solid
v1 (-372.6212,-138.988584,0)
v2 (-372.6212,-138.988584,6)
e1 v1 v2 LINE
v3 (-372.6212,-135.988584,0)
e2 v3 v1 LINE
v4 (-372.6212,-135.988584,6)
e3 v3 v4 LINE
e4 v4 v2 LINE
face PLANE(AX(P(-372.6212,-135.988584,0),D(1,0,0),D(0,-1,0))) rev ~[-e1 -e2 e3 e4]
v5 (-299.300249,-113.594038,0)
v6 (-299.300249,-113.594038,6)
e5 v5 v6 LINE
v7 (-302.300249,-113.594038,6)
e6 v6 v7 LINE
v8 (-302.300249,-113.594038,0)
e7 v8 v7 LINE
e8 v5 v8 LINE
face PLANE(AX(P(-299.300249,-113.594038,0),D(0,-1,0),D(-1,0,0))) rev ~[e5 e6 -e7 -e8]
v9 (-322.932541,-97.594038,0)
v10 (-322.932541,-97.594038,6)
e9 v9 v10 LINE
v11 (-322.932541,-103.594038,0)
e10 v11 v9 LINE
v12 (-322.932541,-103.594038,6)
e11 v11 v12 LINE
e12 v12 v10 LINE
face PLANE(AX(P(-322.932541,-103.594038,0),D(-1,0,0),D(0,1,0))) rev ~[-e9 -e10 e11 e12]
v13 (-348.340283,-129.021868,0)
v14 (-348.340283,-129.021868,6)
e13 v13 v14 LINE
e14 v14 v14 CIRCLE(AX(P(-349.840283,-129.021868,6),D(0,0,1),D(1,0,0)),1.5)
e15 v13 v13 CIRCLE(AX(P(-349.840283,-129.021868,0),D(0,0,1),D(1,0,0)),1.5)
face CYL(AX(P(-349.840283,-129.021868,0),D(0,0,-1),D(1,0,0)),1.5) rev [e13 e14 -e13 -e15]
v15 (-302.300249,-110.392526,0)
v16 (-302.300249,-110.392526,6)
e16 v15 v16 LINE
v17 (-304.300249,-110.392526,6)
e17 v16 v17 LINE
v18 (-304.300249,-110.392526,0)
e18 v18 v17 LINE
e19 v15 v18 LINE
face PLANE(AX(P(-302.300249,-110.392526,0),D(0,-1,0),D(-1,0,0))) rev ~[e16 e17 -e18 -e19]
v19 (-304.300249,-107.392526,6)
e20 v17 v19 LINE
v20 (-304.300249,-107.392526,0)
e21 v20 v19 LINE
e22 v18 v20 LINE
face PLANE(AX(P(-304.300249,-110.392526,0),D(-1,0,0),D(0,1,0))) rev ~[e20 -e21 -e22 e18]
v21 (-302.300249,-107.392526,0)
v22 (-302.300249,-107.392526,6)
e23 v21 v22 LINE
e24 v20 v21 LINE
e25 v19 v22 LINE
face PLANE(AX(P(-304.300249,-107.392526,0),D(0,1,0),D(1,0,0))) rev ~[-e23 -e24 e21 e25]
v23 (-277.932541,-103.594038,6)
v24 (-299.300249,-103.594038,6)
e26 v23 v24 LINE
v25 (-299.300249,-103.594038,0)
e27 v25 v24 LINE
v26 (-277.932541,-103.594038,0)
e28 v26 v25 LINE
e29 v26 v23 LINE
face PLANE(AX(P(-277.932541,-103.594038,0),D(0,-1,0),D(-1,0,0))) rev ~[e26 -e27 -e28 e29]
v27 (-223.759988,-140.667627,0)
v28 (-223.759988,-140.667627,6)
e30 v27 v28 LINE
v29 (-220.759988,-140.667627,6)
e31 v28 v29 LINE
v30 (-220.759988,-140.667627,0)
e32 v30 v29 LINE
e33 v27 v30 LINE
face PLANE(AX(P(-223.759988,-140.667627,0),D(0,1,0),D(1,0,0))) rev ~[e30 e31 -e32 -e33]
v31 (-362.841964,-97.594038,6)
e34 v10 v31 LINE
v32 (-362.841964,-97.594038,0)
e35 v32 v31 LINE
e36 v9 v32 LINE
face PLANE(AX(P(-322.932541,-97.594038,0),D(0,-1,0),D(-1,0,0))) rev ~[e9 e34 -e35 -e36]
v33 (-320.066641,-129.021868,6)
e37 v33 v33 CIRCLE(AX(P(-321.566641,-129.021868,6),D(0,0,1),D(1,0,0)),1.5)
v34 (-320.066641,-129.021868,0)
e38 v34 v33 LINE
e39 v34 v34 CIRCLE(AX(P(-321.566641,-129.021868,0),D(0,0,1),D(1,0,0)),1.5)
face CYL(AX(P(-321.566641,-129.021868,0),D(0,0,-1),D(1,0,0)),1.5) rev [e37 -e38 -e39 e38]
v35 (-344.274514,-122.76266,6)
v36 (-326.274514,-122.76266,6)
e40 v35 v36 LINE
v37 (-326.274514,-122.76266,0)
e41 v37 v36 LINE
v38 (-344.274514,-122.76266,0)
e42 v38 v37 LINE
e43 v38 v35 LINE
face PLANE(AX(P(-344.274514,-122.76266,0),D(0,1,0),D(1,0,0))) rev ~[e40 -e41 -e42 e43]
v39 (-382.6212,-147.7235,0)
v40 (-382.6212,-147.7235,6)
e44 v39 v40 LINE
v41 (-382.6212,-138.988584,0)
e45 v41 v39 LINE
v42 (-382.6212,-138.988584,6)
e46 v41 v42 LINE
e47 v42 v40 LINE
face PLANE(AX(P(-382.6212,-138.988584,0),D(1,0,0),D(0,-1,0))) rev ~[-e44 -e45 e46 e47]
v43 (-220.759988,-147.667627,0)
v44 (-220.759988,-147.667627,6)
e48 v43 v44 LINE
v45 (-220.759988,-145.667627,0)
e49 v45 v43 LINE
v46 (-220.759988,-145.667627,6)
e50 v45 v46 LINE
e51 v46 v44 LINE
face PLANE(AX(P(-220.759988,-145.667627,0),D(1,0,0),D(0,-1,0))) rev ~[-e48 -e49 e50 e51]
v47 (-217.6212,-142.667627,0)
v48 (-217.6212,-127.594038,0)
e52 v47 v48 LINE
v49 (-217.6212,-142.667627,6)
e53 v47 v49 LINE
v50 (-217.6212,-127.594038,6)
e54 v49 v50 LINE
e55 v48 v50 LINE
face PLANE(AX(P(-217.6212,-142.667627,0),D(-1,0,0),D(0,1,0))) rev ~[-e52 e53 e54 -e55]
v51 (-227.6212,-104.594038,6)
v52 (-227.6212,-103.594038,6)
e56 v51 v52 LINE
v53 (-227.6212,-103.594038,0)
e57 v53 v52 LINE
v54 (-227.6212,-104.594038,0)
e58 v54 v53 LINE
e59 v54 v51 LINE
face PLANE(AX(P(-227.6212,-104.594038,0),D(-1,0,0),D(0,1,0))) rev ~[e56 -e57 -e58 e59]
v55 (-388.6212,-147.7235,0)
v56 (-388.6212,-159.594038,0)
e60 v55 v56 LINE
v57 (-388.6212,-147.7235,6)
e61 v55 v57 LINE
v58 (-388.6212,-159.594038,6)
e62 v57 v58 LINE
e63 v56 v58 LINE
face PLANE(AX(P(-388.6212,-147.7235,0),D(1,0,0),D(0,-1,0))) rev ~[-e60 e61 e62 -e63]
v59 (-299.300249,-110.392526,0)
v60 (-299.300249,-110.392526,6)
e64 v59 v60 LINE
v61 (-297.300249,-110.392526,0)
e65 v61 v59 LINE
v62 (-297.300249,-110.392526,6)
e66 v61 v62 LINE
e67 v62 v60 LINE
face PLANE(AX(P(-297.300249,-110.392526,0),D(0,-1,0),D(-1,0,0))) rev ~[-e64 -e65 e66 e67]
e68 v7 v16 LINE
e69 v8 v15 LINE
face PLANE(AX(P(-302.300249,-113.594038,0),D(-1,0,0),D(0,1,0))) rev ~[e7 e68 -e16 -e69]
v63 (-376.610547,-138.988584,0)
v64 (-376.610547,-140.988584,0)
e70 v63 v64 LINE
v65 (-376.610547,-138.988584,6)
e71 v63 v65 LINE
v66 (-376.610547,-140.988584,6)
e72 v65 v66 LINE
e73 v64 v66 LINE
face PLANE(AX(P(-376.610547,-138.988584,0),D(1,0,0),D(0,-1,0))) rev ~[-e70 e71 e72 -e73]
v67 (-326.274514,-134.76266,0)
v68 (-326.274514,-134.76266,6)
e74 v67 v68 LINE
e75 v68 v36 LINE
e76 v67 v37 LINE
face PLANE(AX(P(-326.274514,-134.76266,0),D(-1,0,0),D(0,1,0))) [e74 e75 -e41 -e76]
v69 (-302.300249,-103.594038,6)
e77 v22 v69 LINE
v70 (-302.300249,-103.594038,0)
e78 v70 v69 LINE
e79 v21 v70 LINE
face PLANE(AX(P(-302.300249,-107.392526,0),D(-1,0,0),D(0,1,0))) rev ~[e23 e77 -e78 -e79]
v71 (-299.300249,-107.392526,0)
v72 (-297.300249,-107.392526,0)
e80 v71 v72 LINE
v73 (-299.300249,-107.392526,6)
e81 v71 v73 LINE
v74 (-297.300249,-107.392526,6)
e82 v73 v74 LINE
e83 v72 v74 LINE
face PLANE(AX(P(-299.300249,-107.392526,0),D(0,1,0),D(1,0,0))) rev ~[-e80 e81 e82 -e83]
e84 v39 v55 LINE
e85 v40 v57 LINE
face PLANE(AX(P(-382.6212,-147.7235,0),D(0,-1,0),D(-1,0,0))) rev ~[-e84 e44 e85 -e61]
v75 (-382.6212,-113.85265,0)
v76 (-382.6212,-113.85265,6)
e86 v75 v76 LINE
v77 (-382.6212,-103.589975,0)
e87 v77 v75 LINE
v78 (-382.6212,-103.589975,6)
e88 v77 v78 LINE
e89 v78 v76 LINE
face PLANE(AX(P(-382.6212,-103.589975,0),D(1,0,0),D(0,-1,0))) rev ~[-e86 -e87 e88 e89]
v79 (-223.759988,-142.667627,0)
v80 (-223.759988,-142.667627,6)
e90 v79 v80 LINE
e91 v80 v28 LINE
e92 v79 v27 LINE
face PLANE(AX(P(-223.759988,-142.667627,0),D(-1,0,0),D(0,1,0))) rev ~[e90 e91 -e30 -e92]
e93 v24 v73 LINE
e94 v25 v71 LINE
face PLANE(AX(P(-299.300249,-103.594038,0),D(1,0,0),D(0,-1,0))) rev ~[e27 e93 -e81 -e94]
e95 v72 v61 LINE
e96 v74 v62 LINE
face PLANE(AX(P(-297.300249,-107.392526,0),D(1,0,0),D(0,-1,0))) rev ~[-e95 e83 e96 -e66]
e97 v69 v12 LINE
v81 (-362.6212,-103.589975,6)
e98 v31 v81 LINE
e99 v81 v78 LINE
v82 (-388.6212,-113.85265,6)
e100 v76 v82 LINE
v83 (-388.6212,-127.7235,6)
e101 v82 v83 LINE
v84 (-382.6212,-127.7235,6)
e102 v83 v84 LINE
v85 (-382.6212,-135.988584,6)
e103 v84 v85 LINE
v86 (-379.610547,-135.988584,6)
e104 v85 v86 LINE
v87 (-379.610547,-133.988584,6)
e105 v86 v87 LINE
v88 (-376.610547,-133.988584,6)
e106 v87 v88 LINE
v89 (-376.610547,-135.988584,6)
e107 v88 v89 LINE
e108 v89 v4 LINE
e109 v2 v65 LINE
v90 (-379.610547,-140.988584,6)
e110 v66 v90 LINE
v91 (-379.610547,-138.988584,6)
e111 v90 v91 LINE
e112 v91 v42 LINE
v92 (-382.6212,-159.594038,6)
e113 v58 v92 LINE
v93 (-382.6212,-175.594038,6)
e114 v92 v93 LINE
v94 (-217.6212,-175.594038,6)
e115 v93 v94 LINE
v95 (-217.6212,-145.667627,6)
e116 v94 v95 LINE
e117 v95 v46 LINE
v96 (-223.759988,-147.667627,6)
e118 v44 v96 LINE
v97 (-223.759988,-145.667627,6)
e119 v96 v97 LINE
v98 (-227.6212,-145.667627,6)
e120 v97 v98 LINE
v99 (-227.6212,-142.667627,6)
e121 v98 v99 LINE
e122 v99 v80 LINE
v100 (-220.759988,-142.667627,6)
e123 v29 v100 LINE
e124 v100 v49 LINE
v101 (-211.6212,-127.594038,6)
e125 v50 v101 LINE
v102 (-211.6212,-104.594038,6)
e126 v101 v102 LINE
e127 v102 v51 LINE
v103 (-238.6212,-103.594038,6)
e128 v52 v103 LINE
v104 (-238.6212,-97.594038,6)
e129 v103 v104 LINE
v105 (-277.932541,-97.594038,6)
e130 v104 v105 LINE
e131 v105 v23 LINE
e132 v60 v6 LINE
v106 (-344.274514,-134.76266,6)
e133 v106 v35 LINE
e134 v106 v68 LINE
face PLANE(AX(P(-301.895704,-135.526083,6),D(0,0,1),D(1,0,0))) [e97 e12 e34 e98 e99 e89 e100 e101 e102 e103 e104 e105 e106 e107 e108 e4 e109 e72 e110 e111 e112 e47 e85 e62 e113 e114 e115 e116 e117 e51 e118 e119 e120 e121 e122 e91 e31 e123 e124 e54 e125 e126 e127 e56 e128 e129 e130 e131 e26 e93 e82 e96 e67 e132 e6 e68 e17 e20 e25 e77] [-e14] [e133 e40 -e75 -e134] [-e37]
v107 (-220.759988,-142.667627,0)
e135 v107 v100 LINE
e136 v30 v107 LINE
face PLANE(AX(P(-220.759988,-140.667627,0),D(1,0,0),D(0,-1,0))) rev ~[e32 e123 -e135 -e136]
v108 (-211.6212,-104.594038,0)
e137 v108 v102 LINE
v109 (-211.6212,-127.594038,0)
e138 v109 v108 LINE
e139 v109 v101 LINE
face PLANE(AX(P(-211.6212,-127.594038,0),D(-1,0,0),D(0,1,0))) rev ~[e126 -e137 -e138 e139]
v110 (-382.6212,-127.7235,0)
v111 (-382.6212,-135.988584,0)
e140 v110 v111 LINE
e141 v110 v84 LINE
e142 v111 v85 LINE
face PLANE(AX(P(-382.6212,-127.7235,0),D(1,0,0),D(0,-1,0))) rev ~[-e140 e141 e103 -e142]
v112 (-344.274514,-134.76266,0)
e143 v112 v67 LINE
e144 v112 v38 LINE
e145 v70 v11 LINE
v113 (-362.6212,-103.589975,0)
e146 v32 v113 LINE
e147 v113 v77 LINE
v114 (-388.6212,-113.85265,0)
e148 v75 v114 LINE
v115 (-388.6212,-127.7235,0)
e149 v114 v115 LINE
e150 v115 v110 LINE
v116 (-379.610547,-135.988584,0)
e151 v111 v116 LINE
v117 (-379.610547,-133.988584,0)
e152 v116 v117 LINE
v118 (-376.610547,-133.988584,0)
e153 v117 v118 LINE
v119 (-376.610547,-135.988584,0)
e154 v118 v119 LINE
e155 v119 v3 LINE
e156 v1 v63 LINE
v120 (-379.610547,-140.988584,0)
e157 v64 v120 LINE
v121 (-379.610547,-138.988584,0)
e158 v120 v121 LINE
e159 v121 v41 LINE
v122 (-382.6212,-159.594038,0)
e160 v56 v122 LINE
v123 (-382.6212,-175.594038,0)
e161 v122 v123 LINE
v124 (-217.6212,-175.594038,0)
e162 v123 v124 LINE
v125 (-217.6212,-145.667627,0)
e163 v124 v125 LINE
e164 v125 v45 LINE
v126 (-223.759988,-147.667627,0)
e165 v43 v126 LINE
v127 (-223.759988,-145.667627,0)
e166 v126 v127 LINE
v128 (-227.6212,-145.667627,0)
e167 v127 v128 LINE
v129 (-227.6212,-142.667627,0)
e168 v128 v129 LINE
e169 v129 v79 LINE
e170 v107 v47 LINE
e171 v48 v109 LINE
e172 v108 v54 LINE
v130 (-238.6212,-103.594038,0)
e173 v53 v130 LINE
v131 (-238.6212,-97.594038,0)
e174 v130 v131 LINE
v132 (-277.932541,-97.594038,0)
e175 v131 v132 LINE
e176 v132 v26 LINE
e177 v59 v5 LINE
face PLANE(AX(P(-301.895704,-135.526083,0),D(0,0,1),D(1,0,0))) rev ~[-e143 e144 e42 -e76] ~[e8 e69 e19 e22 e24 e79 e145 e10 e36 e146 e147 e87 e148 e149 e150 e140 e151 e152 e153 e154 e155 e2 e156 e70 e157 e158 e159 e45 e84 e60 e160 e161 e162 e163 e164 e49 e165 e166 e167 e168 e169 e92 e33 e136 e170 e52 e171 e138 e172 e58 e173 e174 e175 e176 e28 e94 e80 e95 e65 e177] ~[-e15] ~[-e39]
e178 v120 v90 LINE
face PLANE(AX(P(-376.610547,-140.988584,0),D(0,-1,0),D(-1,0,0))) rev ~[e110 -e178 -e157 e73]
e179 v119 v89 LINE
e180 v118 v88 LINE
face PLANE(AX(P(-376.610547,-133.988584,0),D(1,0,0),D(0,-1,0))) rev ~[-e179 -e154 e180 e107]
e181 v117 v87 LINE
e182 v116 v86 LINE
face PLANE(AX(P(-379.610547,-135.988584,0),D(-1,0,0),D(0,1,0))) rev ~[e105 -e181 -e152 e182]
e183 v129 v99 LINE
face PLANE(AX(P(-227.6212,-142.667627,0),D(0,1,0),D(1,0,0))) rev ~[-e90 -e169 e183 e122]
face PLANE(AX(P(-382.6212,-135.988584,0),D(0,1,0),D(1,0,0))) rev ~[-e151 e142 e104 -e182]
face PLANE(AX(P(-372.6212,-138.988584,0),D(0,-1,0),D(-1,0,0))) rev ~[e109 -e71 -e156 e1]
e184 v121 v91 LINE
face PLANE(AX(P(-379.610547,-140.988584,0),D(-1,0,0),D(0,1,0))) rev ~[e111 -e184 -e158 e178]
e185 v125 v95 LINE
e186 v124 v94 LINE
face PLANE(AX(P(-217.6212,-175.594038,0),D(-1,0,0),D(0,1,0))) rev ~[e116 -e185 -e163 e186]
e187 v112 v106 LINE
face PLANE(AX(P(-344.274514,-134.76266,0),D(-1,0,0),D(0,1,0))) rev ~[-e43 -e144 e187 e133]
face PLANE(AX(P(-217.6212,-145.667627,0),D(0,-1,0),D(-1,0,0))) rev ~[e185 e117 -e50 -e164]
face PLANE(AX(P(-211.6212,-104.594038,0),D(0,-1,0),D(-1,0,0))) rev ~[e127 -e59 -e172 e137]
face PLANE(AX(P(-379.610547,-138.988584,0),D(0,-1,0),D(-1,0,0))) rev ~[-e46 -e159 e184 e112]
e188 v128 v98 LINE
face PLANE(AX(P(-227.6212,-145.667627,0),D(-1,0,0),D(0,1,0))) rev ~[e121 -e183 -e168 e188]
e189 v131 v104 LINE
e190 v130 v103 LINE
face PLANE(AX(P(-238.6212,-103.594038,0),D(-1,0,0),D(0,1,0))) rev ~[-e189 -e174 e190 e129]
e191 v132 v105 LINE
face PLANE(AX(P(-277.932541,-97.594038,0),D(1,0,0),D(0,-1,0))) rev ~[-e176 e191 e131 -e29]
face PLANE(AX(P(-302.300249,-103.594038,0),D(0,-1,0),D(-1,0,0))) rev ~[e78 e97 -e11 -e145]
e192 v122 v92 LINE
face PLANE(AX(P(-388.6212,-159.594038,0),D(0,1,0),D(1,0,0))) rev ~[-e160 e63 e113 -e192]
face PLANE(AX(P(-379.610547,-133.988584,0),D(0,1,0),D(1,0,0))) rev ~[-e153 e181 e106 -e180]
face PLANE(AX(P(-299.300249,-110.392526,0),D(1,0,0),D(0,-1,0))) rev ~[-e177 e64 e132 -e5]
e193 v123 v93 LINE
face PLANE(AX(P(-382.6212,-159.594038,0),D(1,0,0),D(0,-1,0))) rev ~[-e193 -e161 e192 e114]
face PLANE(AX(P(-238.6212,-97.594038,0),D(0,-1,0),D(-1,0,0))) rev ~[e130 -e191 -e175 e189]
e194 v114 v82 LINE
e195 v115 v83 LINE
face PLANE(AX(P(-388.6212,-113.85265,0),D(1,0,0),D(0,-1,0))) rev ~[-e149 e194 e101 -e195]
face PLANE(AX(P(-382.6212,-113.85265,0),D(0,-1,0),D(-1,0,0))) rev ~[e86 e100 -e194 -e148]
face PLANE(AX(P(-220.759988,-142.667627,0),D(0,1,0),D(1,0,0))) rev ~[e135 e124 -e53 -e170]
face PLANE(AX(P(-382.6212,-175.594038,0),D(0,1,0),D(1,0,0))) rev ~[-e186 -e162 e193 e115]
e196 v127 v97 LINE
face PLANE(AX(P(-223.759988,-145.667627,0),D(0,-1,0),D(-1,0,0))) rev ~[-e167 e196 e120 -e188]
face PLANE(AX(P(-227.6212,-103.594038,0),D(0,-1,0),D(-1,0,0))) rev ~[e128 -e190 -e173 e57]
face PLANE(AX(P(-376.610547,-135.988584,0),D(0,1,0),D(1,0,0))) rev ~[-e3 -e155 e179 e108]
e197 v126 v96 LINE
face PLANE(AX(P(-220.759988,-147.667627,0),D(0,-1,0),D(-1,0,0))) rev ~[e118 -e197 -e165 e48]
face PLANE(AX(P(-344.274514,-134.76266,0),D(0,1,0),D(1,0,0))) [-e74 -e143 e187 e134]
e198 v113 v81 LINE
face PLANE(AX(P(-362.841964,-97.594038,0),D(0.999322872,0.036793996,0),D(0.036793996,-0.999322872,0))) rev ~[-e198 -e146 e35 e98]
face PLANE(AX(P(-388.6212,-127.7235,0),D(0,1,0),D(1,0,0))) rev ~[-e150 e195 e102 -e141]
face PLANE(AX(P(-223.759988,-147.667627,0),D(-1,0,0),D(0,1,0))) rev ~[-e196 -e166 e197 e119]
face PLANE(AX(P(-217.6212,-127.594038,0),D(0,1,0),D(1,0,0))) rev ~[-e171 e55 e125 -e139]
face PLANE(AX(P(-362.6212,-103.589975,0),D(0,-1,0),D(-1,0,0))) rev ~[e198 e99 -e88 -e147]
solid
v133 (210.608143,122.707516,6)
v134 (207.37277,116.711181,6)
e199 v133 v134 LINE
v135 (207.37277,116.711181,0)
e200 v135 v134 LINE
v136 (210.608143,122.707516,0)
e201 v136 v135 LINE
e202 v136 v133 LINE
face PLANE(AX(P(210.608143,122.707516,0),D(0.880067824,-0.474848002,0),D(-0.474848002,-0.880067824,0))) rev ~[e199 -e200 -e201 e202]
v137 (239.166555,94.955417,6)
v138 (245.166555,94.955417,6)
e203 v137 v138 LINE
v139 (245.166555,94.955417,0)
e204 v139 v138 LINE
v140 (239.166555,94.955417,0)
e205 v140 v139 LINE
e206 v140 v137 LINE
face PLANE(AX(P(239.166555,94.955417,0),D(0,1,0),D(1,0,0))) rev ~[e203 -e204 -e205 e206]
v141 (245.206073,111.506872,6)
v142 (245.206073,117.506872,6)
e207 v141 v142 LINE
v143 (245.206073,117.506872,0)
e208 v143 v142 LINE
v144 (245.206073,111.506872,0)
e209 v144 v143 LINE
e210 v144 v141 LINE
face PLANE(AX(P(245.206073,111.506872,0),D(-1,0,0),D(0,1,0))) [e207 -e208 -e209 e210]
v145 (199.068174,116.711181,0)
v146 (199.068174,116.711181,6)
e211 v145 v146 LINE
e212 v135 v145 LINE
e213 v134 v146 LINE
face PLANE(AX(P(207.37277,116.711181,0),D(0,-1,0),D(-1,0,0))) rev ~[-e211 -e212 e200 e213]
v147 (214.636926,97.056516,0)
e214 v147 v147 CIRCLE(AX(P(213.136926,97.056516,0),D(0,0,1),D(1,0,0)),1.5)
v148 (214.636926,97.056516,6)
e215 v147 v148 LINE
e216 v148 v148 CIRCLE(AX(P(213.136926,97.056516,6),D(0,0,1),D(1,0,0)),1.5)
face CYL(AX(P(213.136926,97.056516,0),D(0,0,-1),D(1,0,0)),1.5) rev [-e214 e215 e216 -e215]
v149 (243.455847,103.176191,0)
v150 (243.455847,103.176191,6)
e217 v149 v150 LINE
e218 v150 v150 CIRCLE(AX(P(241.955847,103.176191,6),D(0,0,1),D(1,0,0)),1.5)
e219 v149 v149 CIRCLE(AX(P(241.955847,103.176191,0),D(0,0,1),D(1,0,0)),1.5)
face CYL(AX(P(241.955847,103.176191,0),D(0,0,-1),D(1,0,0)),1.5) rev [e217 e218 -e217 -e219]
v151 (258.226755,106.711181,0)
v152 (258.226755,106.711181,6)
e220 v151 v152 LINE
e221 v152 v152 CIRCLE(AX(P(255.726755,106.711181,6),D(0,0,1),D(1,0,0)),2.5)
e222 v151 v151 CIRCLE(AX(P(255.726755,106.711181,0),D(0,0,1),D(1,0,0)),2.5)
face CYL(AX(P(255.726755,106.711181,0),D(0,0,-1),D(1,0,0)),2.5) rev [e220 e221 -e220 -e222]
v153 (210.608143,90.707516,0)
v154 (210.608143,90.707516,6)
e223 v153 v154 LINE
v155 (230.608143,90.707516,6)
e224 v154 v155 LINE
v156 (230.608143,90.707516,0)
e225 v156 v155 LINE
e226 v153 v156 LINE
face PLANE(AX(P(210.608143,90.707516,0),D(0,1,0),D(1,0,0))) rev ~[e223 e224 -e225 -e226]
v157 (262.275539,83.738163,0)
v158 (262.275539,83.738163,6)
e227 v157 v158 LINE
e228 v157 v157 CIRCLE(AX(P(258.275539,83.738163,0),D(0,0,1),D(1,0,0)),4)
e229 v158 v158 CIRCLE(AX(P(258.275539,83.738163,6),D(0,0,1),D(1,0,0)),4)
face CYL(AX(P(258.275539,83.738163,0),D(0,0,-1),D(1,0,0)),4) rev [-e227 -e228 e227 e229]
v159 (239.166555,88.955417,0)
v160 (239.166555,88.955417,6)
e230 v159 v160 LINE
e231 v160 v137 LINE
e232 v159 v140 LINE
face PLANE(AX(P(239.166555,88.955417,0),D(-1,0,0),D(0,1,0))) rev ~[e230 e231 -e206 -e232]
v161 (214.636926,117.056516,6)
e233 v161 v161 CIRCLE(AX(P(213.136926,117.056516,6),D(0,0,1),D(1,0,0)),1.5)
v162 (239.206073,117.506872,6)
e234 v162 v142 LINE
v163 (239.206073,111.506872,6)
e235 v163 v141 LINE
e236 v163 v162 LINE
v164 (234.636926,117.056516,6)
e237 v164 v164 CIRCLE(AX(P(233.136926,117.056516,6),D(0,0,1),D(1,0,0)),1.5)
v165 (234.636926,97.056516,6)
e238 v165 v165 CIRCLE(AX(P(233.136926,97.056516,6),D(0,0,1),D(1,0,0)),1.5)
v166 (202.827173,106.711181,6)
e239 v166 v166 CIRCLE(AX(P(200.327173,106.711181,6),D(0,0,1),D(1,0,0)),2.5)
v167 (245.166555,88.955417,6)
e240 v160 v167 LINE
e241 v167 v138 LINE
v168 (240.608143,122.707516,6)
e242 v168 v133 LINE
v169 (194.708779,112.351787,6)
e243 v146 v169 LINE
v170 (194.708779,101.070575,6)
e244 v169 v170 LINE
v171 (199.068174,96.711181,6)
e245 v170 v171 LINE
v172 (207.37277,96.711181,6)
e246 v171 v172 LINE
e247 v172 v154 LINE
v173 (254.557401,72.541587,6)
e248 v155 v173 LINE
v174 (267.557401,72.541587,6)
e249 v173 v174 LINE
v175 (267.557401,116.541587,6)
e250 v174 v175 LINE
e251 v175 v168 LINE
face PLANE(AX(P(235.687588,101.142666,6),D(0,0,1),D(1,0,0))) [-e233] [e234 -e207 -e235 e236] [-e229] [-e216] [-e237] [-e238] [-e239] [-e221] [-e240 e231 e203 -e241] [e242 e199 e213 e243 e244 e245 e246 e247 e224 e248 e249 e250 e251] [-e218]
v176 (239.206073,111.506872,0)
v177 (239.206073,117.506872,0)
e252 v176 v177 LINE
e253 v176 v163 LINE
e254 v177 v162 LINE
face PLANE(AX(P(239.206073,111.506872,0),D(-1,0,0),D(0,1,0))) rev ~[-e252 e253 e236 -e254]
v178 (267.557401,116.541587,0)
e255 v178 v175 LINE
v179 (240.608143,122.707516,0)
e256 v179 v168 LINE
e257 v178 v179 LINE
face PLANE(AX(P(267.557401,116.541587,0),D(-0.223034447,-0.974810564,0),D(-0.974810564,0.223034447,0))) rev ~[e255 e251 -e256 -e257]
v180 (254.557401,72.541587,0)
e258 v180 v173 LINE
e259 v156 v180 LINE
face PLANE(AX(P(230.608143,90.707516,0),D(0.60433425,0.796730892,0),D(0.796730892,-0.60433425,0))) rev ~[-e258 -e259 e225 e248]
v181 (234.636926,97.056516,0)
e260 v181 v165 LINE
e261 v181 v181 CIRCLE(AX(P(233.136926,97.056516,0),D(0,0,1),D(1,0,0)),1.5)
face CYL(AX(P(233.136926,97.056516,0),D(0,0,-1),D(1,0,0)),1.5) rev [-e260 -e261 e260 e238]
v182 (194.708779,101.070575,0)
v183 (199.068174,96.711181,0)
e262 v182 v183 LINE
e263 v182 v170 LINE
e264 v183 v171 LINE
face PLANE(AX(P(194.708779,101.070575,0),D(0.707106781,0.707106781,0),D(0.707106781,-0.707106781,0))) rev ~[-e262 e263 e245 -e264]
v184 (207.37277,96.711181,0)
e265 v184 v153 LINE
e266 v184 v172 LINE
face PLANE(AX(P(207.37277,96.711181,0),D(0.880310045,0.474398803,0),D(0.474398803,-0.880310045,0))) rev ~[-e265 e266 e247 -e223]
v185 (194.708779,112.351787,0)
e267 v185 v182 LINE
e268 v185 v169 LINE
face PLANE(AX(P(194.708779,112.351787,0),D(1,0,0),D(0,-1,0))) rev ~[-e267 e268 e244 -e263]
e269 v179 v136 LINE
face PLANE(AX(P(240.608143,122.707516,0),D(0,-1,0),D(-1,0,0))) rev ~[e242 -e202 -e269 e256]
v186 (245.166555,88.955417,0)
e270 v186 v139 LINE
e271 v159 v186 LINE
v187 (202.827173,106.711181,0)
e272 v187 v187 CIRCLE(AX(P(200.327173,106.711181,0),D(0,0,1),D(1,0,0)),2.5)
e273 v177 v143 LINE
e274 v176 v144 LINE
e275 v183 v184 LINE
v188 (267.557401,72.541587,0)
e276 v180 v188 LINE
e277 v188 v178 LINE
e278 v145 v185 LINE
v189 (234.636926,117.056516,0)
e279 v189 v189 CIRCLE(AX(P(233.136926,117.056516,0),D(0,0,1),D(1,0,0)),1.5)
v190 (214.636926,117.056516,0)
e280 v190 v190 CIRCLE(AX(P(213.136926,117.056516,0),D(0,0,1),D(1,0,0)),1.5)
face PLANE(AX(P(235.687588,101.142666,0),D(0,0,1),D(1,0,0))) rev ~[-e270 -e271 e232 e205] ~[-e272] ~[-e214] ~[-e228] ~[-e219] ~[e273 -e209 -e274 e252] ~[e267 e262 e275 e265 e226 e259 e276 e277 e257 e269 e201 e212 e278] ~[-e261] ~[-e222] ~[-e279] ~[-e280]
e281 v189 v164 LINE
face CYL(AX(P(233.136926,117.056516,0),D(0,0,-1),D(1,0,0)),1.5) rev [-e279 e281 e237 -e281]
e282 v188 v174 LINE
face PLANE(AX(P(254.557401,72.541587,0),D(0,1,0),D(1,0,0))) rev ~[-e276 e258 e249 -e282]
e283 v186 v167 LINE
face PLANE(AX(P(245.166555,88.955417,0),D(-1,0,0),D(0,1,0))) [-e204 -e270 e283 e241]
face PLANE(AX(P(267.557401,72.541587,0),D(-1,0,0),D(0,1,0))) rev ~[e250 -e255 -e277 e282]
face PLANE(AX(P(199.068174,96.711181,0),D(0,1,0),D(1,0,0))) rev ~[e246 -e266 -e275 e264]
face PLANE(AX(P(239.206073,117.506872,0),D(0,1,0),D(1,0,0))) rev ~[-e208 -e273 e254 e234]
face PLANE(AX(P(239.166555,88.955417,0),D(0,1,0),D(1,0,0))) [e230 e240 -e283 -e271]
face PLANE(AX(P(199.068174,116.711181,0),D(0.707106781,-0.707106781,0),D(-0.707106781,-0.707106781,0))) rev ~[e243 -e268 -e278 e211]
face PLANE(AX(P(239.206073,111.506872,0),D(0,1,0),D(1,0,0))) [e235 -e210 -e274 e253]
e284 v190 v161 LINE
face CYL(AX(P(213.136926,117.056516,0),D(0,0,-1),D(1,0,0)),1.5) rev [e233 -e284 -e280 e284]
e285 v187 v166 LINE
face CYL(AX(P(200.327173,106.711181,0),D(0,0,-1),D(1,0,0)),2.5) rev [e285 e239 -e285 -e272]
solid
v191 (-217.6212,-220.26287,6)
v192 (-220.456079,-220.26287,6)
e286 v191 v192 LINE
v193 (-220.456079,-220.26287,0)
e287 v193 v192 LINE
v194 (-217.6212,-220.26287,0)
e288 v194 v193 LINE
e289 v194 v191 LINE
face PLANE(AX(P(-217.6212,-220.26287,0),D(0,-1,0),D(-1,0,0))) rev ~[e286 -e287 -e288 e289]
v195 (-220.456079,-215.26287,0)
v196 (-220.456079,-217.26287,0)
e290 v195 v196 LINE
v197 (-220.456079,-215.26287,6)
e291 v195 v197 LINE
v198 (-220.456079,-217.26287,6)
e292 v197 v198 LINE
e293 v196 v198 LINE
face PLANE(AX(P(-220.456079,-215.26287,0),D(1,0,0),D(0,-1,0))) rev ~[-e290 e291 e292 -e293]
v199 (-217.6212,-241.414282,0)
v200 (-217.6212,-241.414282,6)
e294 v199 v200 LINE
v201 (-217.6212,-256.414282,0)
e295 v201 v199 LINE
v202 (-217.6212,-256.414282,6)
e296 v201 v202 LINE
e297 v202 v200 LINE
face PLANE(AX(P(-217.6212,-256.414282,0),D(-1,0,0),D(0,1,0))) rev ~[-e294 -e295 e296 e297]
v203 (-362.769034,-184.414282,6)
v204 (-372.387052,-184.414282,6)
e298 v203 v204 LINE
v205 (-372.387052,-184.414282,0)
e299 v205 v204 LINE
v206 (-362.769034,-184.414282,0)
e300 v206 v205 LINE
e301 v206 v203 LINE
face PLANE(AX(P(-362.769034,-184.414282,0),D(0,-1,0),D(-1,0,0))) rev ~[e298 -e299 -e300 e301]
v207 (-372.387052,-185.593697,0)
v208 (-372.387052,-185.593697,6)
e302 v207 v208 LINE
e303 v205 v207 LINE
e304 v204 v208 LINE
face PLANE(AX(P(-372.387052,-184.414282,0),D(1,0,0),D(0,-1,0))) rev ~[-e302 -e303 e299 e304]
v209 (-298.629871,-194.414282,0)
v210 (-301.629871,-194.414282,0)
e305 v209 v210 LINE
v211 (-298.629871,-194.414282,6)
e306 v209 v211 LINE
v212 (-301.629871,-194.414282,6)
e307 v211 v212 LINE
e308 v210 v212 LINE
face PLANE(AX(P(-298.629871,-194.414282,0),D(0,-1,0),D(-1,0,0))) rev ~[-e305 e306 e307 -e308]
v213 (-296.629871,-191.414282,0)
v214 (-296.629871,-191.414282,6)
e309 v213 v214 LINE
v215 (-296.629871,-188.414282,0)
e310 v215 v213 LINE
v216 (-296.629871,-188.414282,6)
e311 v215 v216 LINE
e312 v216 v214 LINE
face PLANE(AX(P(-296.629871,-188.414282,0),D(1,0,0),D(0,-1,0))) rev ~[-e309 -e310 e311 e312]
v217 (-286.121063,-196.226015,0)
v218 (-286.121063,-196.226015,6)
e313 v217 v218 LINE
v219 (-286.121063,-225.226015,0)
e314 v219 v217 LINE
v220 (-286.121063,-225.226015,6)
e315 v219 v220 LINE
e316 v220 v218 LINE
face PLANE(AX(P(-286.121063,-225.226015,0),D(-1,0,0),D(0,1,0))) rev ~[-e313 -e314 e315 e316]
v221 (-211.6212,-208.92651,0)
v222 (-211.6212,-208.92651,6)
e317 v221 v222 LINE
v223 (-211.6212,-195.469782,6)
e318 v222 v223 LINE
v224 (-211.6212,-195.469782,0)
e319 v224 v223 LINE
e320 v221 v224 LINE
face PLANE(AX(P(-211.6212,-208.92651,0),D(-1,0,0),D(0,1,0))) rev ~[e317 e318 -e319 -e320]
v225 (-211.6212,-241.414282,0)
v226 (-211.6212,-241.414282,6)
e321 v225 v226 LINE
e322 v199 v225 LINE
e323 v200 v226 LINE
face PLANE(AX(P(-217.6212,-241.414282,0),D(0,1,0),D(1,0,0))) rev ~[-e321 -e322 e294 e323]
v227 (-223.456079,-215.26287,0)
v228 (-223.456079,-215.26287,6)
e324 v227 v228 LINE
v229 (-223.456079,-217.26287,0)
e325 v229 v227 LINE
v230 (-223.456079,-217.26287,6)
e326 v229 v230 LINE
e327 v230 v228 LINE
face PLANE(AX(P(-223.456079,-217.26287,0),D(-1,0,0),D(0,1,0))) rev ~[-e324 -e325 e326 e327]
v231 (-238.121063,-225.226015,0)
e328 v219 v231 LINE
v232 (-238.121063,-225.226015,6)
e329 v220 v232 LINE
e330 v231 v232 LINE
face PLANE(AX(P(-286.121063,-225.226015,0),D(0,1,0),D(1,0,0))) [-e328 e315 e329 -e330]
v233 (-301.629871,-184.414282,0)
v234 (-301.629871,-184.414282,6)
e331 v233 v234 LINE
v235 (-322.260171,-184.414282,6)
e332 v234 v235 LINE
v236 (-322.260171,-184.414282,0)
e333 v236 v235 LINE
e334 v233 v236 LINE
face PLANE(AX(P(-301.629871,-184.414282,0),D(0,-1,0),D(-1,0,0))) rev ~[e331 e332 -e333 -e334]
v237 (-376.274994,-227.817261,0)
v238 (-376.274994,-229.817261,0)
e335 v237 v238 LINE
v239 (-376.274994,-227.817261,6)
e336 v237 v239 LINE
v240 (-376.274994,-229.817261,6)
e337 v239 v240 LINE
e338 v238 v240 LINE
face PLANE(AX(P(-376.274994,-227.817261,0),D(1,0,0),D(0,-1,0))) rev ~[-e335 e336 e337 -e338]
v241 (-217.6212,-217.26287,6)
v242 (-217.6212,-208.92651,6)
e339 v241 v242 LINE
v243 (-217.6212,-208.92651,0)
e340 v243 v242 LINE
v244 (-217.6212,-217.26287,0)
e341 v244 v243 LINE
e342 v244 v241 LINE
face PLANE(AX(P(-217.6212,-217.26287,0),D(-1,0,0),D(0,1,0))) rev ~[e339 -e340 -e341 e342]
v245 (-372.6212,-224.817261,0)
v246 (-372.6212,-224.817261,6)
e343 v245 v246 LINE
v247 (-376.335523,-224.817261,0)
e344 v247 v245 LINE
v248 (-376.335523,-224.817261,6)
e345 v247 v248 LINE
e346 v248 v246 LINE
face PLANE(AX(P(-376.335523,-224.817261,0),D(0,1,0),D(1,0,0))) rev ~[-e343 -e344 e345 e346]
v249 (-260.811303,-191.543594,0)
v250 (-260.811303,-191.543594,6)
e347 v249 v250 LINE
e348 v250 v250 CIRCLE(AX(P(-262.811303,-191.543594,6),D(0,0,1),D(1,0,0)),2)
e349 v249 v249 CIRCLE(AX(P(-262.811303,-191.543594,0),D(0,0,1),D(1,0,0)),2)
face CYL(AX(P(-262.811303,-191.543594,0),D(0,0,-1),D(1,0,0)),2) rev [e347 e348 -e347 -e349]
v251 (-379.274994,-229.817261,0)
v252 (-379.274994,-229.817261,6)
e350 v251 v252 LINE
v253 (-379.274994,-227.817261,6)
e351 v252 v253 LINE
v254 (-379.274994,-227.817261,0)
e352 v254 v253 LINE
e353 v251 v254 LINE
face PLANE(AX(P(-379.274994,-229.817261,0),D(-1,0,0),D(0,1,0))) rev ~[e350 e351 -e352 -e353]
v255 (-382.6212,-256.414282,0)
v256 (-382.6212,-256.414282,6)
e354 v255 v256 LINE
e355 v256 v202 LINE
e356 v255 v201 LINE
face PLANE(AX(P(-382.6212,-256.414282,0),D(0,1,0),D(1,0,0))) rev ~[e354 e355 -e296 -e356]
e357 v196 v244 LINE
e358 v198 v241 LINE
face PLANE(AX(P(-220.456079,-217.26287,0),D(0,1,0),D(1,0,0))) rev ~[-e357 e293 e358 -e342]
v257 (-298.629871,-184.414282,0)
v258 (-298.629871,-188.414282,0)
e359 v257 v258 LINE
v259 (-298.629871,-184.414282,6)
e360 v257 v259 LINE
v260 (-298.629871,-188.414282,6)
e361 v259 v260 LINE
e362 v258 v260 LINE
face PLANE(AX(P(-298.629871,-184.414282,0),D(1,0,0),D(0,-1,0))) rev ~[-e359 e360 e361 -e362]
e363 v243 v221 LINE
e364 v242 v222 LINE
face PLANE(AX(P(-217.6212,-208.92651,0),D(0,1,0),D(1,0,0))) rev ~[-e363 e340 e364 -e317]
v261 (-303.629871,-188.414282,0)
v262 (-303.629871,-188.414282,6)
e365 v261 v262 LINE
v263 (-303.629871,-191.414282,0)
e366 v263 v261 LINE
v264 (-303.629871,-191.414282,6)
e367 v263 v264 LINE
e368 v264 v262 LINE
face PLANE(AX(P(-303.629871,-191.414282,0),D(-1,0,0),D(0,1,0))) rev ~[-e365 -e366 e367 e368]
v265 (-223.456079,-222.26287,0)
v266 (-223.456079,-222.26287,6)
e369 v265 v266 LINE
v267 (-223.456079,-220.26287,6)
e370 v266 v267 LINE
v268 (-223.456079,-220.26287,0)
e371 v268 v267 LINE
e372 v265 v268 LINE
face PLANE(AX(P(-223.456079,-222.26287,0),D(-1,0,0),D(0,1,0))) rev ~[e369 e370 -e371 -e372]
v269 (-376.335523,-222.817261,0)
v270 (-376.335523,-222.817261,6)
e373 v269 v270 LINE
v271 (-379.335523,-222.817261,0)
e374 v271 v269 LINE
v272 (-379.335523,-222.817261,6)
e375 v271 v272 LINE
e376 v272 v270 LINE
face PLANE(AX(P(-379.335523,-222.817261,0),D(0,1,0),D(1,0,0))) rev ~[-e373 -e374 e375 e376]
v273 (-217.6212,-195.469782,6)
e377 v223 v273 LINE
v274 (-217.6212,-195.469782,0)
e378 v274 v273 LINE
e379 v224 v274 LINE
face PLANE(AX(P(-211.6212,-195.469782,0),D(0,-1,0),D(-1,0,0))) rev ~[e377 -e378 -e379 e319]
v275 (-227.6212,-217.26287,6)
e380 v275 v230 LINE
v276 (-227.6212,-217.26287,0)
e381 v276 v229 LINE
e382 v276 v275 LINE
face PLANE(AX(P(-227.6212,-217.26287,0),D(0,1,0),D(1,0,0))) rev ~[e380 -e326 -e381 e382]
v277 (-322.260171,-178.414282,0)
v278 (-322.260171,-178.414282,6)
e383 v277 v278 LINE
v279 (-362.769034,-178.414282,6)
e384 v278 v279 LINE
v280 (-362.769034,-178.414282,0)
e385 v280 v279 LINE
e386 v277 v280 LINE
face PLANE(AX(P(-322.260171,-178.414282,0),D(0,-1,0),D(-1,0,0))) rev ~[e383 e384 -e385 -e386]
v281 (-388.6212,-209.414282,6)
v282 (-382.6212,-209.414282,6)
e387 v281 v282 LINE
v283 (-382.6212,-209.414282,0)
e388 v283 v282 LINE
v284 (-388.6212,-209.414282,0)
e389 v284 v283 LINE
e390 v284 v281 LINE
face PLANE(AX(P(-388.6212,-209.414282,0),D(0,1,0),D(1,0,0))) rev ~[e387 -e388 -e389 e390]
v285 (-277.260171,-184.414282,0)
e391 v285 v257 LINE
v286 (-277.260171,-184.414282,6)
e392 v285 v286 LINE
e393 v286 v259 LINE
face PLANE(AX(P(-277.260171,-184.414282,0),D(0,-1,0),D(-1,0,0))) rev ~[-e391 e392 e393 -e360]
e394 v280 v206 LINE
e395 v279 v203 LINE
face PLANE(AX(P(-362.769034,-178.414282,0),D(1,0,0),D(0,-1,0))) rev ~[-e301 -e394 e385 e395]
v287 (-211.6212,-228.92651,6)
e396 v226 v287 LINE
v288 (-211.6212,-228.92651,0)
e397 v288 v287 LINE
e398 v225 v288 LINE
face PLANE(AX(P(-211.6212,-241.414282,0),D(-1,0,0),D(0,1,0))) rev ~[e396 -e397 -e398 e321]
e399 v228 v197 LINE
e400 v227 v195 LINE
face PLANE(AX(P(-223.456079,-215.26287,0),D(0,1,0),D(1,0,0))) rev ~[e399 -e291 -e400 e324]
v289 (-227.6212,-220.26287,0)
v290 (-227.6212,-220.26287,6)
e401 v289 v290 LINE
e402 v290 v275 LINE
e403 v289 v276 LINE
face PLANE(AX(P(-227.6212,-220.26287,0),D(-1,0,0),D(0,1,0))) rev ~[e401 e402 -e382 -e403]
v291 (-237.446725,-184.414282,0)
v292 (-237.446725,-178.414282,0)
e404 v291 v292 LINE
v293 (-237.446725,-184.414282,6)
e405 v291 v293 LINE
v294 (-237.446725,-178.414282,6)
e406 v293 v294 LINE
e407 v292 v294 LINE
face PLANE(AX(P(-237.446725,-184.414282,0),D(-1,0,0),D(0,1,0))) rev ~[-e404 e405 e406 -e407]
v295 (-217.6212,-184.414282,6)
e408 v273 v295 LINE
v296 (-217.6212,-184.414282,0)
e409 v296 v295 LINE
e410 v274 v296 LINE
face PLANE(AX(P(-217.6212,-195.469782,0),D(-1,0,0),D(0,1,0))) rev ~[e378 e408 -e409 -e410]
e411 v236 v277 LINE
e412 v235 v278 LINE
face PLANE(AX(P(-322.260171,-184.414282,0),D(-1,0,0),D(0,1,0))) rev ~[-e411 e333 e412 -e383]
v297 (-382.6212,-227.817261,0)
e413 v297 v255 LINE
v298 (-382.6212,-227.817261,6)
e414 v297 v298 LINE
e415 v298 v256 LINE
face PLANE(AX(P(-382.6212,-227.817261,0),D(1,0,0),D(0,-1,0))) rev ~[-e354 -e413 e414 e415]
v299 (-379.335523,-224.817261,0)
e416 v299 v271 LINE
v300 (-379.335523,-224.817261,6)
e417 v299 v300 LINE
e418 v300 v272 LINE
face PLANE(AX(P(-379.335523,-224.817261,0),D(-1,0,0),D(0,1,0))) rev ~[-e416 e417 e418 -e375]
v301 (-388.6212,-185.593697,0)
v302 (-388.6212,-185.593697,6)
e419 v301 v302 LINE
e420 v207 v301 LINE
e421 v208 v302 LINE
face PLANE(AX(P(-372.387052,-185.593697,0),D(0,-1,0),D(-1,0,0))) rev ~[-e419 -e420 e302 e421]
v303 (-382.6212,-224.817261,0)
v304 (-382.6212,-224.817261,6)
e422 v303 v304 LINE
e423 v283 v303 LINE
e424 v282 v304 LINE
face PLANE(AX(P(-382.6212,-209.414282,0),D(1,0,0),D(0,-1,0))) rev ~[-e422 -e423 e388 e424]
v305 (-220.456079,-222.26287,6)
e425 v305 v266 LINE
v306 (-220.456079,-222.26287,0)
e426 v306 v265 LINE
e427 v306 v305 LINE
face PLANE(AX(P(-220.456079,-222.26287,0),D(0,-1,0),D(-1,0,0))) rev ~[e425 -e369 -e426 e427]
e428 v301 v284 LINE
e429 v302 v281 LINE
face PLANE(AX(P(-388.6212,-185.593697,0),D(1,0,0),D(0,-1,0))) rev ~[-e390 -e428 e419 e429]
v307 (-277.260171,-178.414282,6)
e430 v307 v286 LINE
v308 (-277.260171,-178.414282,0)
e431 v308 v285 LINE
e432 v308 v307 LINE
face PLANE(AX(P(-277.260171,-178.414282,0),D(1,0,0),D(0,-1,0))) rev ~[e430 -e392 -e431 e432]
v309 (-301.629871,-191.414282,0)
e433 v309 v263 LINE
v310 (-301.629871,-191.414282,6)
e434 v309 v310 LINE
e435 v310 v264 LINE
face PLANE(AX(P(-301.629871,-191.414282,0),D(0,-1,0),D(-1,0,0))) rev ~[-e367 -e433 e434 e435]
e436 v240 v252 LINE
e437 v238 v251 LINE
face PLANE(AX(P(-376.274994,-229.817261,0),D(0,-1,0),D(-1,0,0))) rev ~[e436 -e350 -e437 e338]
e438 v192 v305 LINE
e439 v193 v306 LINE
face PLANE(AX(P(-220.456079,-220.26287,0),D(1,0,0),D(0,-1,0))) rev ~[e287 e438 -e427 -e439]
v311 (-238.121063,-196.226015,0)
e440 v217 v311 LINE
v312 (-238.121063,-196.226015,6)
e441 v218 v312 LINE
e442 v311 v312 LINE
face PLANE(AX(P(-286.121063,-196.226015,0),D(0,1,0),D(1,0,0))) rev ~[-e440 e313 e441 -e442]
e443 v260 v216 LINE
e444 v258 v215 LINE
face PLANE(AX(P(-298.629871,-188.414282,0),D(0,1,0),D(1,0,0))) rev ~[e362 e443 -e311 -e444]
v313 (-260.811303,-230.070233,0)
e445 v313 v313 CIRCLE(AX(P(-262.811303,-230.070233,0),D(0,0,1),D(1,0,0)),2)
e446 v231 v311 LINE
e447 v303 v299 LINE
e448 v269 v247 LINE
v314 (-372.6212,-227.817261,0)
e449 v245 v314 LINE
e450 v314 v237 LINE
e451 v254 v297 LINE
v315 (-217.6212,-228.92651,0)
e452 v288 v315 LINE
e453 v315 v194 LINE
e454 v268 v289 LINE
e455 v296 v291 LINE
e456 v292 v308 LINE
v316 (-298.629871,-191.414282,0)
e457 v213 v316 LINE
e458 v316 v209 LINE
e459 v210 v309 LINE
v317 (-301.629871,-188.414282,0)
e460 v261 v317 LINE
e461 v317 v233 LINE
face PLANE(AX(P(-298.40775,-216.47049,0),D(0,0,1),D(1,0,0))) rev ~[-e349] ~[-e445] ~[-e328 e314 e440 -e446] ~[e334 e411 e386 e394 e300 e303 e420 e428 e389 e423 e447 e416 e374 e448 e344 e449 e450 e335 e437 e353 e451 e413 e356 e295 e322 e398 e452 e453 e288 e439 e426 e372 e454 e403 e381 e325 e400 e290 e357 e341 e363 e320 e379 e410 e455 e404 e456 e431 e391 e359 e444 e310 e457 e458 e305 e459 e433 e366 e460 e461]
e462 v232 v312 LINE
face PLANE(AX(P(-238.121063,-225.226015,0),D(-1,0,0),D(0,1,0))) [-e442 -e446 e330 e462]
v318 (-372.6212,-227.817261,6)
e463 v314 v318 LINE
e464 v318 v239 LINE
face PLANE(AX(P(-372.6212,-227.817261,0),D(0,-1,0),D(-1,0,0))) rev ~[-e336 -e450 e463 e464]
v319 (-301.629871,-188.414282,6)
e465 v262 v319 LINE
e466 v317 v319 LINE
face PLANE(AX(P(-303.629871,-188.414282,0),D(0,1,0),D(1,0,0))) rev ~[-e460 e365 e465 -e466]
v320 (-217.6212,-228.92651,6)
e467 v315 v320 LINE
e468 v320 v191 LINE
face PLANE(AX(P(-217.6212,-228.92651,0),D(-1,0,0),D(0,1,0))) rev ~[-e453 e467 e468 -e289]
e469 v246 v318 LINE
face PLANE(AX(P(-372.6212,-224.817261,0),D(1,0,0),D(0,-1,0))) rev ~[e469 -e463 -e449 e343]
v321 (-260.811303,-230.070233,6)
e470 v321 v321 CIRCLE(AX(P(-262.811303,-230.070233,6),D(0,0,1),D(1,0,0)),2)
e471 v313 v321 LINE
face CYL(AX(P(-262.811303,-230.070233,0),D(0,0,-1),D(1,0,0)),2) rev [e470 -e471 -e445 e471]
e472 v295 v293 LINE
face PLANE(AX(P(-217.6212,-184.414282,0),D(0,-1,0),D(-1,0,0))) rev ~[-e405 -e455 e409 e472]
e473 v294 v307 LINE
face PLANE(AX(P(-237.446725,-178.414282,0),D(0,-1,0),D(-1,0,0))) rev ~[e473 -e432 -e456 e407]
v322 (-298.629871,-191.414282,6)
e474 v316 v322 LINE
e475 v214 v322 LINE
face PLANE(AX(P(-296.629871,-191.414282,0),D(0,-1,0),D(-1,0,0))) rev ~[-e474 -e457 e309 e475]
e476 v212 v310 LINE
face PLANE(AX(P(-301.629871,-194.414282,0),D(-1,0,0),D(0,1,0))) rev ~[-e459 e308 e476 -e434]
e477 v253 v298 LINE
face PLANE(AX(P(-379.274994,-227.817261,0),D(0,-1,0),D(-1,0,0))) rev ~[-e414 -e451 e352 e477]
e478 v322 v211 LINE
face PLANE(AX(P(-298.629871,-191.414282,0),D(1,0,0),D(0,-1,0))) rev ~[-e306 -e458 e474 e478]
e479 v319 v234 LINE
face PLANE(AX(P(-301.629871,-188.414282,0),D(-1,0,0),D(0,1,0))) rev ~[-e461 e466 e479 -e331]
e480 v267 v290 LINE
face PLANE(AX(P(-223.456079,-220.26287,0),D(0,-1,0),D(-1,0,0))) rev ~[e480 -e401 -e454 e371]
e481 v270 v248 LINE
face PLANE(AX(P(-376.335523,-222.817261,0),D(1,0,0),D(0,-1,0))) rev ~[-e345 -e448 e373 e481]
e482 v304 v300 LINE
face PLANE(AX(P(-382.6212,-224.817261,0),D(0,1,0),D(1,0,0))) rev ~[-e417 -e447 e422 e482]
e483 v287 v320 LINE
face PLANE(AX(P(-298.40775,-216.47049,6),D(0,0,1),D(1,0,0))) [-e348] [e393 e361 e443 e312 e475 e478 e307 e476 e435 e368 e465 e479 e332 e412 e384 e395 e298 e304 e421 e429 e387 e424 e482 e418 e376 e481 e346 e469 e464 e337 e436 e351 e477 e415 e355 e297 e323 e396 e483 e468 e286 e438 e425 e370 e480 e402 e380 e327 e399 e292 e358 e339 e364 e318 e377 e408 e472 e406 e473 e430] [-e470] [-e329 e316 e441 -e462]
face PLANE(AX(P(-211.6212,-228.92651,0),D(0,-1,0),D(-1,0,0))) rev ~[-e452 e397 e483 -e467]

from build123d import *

# Parameters (mm, degrees)
F0_R     = 2
F0_W     = 48
F0_H     = 29
F1_DEPTH = 6
F0_R_2   = 1.5
F0_W_2   = 18
F0_H_2   = 12
F2_DEPTH = 6
F0_R_3   = 4
F0_W_3   = 6
F0_H_3   = 6
F0_R_4   = 2.5
F3_DEPTH = 6


# Not quite as in the source:
# - a feature of the source that left no trace in its solid (it failed there, or was rolled back) is left out


with BuildPart() as f1:
    # F0 (on Top) → F1 (new body)
    with BuildSketch(Plane.XY):
        Polygon((-322.260171175, -178.4142817259), (-362.7690343857, -178.4142817259), (-362.7690343857, -184.4142817259), (-372.3870515823, -184.4142817259), (-372.3870515823, -185.5936968327), (-388.6211997944, -185.5936968327), (-388.6211997944, -209.4142817259), (-382.6211997944, -209.4142817259), (-382.6211997944, -224.8172610998), (-379.3355226517, -224.8172610998), (-379.3355226517, -222.8172610998), (-376.3355226517, -222.8172610998), (-376.3355226517, -224.8172610998), (-372.6211997944, -224.8172610998), (-372.6211997944, -227.8172610998), (-376.2749941349, -227.8172610998), (-376.2749941349, -229.8172610998), (-379.2749941349, -229.8172610998), (-379.2749941349, -227.8172610998), (-382.6211997944, -227.8172610998), (-382.6211997944, -256.4142817259), (-217.6211997944, -256.4142817259), (-217.6211997944, -241.4142817259), (-211.6211997944, -241.4142817259), (-211.6211997944, -228.9265096188), (-217.6211997944, -228.9265096188), (-217.6211997944, -220.2628701925), (-220.4560786486, -220.2628701925), (-220.4560786486, -222.2628701925), (-223.4560786486, -222.2628701925), (-223.4560786486, -220.2628701925), (-227.6211997944, -220.2628701925), (-227.6211997944, -217.2628701925), (-223.4560786486, -217.2628701925), (-223.4560786486, -215.2628701925), (-220.4560786486, -215.2628701925), (-220.4560786486, -217.2628701925), (-217.6211997944, -217.2628701925), (-217.6211997944, -208.9265096188), (-211.6211997944, -208.9265096188), (-211.6211997944, -195.4697817564), (-217.6211997944, -195.4697817564), (-217.6211997944, -184.4142817259), (-237.4467253685, -184.4142817259), (-237.4467253685, -178.4142817259), (-277.260171175, -178.4142817259), (-277.260171175, -184.4142817259), (-298.62987113, -184.4142817259), (-298.62987113, -188.4142817259), (-296.62987113, -188.4142817259), (-296.62987113, -191.4142817259), (-298.62987113, -191.4142817259), (-298.62987113, -194.4142817259), (-301.62987113, -194.4142817259), (-301.62987113, -191.4142817259), (-303.62987113, -191.4142817259), (-303.62987113, -188.4142817259), (-301.62987113, -188.4142817259), (-301.62987113, -184.4142817259), (-322.260171175, -184.4142817259), align=None)
        with Locations((-262.8113031387, -230.070233345)):
            Circle(F0_R, mode=Mode.SUBTRACT)
        with Locations((-262.1210625172, -210.7260148525)):
            Rectangle(F0_W, F0_H, mode=Mode.SUBTRACT)
        with Locations((-262.8113031387, -191.5435940027)):
            Circle(F0_R, mode=Mode.SUBTRACT)
    extrude(amount=F1_DEPTH)


with BuildPart() as f2:
    # F0 (on Top) → F2 (new body)
    with BuildSketch(Plane.XY):
        Polygon((-322.9325413704, -97.594037652), (-362.841963768, -97.594037652), (-362.6211997944, -103.5899748822), (-382.6211997944, -103.5899748822), (-382.6211997944, -113.8526499271), (-388.6211997944, -113.8526499271), (-388.6211997944, -127.7235001326), (-382.6211997944, -127.7235001326), (-382.6211997944, -135.98858428), (-379.6105473042, -135.98858428), (-379.6105473042, -133.98858428), (-376.6105473042, -133.98858428), (-376.6105473042, -135.98858428), (-372.6211997944, -135.98858428), (-372.6211997944, -138.98858428), (-376.6105473042, -138.98858428), (-376.6105473042, -140.98858428), (-379.6105473042, -140.98858428), (-379.6105473042, -138.98858428), (-382.6211997944, -138.98858428), (-382.6211997944, -147.7235001326), (-388.6211997944, -147.7235001326), (-388.6211997944, -159.594037652), (-382.6211997944, -159.594037652), (-382.6211997944, -175.594037652), (-217.6211997944, -175.594037652), (-217.6211997944, -145.6676274538), (-220.7599878311, -145.6676274538), (-220.7599878311, -147.6676274538), (-223.7599878311, -147.6676274538), (-223.7599878311, -145.6676274538), (-227.6211997944, -145.6676274538), (-227.6211997944, -142.6676274538), (-223.7599878311, -142.6676274538), (-223.7599878311, -140.6676274538), (-220.7599878311, -140.6676274538), (-220.7599878311, -142.6676274538), (-217.6211997944, -142.6676274538), (-217.6211997944, -127.594037652), (-211.6211997944, -127.594037652), (-211.6211997944, -104.594037652), (-227.6211997944, -104.594037652), (-227.6211997944, -103.594037652), (-238.6211997944, -103.594037652), (-238.6211997944, -97.594037652), (-277.9325413704, -97.594037652), (-277.9325413704, -103.594037652), (-299.3002493382, -103.594037652), (-299.3002493382, -107.3925257921), (-297.3002493382, -107.3925257921), (-297.3002493382, -110.3925257921), (-299.3002493382, -110.3925257921), (-299.3002493382, -113.594037652), (-302.3002493382, -113.594037652), (-302.3002493382, -110.3925257921), (-304.3002493382, -110.3925257921), (-304.3002493382, -107.3925257921), (-302.3002493382, -107.3925257921), (-302.3002493382, -103.594037652), (-322.9325413704, -103.594037652), align=None)
        with Locations((-349.8402833939, -129.0218681097)):
            Circle(F0_R_2, mode=Mode.SUBTRACT)
        with Locations((-335.2745141983, -128.7626596689)):
            Rectangle(F0_W_2, F0_H_2, mode=Mode.SUBTRACT)
        with Locations((-321.5666413307, -129.0218681097)):
            Circle(F0_R_2, mode=Mode.SUBTRACT)
    extrude(amount=F2_DEPTH)


with BuildPart() as f3:
    # F0 (on Top) → F3 (new body)
    with BuildSketch(Plane.XY):
        Polygon((240.6081428044, 122.7075162329), (210.6081428044, 122.7075162329), (207.3727697134, 116.7111811042), (199.0681737661, 116.7111811042), (194.7087794542, 112.3517867923), (194.7087794542, 101.0705754161), (199.0681737661, 96.7111811042), (207.3727697134, 96.7111811042), (210.6081428044, 90.7075162329), (230.6081428044, 90.7075162329), (254.5574009418, 72.5415870547), (267.5574009418, 72.5415870547), (267.5574009418, 116.5415870547), align=None)
        with Locations((213.1369262934, 97.0565155149)):
            Circle(F0_R_2, mode=Mode.SUBTRACT)
        with Locations((258.2755386829, 83.7381631136)):
            Circle(F0_R_3, mode=Mode.SUBTRACT)
        with Locations((242.166555047, 91.9554172754)):
            Rectangle(F0_W_3, F0_H_3, mode=Mode.SUBTRACT)
        with Locations((233.1369262934, 97.0565155149)):
            Circle(F0_R_2, mode=Mode.SUBTRACT)
        with Locations((200.3271728754, 106.7111811042)):
            Circle(F0_R_4, mode=Mode.SUBTRACT)
        with Locations((213.1369262934, 117.0565155149)):
            Circle(F0_R_2, mode=Mode.SUBTRACT)
        with Locations((241.9558465481, 103.1761914492)):
            Circle(F0_R_2, mode=Mode.SUBTRACT)
        with Locations((255.7267546654, 106.7111811042)):
            Circle(F0_R_4, mode=Mode.SUBTRACT)
        with Locations((242.2060729265, 114.5068718791)):
            Rectangle(F0_W_3, F0_H_3, mode=Mode.SUBTRACT)
        with Locations((233.1369262934, 117.0565155149)):
            Circle(F0_R_2, mode=Mode.SUBTRACT)
    extrude(amount=F3_DEPTH)


solid = Compound([f1.part, f2.part, f3.part])
